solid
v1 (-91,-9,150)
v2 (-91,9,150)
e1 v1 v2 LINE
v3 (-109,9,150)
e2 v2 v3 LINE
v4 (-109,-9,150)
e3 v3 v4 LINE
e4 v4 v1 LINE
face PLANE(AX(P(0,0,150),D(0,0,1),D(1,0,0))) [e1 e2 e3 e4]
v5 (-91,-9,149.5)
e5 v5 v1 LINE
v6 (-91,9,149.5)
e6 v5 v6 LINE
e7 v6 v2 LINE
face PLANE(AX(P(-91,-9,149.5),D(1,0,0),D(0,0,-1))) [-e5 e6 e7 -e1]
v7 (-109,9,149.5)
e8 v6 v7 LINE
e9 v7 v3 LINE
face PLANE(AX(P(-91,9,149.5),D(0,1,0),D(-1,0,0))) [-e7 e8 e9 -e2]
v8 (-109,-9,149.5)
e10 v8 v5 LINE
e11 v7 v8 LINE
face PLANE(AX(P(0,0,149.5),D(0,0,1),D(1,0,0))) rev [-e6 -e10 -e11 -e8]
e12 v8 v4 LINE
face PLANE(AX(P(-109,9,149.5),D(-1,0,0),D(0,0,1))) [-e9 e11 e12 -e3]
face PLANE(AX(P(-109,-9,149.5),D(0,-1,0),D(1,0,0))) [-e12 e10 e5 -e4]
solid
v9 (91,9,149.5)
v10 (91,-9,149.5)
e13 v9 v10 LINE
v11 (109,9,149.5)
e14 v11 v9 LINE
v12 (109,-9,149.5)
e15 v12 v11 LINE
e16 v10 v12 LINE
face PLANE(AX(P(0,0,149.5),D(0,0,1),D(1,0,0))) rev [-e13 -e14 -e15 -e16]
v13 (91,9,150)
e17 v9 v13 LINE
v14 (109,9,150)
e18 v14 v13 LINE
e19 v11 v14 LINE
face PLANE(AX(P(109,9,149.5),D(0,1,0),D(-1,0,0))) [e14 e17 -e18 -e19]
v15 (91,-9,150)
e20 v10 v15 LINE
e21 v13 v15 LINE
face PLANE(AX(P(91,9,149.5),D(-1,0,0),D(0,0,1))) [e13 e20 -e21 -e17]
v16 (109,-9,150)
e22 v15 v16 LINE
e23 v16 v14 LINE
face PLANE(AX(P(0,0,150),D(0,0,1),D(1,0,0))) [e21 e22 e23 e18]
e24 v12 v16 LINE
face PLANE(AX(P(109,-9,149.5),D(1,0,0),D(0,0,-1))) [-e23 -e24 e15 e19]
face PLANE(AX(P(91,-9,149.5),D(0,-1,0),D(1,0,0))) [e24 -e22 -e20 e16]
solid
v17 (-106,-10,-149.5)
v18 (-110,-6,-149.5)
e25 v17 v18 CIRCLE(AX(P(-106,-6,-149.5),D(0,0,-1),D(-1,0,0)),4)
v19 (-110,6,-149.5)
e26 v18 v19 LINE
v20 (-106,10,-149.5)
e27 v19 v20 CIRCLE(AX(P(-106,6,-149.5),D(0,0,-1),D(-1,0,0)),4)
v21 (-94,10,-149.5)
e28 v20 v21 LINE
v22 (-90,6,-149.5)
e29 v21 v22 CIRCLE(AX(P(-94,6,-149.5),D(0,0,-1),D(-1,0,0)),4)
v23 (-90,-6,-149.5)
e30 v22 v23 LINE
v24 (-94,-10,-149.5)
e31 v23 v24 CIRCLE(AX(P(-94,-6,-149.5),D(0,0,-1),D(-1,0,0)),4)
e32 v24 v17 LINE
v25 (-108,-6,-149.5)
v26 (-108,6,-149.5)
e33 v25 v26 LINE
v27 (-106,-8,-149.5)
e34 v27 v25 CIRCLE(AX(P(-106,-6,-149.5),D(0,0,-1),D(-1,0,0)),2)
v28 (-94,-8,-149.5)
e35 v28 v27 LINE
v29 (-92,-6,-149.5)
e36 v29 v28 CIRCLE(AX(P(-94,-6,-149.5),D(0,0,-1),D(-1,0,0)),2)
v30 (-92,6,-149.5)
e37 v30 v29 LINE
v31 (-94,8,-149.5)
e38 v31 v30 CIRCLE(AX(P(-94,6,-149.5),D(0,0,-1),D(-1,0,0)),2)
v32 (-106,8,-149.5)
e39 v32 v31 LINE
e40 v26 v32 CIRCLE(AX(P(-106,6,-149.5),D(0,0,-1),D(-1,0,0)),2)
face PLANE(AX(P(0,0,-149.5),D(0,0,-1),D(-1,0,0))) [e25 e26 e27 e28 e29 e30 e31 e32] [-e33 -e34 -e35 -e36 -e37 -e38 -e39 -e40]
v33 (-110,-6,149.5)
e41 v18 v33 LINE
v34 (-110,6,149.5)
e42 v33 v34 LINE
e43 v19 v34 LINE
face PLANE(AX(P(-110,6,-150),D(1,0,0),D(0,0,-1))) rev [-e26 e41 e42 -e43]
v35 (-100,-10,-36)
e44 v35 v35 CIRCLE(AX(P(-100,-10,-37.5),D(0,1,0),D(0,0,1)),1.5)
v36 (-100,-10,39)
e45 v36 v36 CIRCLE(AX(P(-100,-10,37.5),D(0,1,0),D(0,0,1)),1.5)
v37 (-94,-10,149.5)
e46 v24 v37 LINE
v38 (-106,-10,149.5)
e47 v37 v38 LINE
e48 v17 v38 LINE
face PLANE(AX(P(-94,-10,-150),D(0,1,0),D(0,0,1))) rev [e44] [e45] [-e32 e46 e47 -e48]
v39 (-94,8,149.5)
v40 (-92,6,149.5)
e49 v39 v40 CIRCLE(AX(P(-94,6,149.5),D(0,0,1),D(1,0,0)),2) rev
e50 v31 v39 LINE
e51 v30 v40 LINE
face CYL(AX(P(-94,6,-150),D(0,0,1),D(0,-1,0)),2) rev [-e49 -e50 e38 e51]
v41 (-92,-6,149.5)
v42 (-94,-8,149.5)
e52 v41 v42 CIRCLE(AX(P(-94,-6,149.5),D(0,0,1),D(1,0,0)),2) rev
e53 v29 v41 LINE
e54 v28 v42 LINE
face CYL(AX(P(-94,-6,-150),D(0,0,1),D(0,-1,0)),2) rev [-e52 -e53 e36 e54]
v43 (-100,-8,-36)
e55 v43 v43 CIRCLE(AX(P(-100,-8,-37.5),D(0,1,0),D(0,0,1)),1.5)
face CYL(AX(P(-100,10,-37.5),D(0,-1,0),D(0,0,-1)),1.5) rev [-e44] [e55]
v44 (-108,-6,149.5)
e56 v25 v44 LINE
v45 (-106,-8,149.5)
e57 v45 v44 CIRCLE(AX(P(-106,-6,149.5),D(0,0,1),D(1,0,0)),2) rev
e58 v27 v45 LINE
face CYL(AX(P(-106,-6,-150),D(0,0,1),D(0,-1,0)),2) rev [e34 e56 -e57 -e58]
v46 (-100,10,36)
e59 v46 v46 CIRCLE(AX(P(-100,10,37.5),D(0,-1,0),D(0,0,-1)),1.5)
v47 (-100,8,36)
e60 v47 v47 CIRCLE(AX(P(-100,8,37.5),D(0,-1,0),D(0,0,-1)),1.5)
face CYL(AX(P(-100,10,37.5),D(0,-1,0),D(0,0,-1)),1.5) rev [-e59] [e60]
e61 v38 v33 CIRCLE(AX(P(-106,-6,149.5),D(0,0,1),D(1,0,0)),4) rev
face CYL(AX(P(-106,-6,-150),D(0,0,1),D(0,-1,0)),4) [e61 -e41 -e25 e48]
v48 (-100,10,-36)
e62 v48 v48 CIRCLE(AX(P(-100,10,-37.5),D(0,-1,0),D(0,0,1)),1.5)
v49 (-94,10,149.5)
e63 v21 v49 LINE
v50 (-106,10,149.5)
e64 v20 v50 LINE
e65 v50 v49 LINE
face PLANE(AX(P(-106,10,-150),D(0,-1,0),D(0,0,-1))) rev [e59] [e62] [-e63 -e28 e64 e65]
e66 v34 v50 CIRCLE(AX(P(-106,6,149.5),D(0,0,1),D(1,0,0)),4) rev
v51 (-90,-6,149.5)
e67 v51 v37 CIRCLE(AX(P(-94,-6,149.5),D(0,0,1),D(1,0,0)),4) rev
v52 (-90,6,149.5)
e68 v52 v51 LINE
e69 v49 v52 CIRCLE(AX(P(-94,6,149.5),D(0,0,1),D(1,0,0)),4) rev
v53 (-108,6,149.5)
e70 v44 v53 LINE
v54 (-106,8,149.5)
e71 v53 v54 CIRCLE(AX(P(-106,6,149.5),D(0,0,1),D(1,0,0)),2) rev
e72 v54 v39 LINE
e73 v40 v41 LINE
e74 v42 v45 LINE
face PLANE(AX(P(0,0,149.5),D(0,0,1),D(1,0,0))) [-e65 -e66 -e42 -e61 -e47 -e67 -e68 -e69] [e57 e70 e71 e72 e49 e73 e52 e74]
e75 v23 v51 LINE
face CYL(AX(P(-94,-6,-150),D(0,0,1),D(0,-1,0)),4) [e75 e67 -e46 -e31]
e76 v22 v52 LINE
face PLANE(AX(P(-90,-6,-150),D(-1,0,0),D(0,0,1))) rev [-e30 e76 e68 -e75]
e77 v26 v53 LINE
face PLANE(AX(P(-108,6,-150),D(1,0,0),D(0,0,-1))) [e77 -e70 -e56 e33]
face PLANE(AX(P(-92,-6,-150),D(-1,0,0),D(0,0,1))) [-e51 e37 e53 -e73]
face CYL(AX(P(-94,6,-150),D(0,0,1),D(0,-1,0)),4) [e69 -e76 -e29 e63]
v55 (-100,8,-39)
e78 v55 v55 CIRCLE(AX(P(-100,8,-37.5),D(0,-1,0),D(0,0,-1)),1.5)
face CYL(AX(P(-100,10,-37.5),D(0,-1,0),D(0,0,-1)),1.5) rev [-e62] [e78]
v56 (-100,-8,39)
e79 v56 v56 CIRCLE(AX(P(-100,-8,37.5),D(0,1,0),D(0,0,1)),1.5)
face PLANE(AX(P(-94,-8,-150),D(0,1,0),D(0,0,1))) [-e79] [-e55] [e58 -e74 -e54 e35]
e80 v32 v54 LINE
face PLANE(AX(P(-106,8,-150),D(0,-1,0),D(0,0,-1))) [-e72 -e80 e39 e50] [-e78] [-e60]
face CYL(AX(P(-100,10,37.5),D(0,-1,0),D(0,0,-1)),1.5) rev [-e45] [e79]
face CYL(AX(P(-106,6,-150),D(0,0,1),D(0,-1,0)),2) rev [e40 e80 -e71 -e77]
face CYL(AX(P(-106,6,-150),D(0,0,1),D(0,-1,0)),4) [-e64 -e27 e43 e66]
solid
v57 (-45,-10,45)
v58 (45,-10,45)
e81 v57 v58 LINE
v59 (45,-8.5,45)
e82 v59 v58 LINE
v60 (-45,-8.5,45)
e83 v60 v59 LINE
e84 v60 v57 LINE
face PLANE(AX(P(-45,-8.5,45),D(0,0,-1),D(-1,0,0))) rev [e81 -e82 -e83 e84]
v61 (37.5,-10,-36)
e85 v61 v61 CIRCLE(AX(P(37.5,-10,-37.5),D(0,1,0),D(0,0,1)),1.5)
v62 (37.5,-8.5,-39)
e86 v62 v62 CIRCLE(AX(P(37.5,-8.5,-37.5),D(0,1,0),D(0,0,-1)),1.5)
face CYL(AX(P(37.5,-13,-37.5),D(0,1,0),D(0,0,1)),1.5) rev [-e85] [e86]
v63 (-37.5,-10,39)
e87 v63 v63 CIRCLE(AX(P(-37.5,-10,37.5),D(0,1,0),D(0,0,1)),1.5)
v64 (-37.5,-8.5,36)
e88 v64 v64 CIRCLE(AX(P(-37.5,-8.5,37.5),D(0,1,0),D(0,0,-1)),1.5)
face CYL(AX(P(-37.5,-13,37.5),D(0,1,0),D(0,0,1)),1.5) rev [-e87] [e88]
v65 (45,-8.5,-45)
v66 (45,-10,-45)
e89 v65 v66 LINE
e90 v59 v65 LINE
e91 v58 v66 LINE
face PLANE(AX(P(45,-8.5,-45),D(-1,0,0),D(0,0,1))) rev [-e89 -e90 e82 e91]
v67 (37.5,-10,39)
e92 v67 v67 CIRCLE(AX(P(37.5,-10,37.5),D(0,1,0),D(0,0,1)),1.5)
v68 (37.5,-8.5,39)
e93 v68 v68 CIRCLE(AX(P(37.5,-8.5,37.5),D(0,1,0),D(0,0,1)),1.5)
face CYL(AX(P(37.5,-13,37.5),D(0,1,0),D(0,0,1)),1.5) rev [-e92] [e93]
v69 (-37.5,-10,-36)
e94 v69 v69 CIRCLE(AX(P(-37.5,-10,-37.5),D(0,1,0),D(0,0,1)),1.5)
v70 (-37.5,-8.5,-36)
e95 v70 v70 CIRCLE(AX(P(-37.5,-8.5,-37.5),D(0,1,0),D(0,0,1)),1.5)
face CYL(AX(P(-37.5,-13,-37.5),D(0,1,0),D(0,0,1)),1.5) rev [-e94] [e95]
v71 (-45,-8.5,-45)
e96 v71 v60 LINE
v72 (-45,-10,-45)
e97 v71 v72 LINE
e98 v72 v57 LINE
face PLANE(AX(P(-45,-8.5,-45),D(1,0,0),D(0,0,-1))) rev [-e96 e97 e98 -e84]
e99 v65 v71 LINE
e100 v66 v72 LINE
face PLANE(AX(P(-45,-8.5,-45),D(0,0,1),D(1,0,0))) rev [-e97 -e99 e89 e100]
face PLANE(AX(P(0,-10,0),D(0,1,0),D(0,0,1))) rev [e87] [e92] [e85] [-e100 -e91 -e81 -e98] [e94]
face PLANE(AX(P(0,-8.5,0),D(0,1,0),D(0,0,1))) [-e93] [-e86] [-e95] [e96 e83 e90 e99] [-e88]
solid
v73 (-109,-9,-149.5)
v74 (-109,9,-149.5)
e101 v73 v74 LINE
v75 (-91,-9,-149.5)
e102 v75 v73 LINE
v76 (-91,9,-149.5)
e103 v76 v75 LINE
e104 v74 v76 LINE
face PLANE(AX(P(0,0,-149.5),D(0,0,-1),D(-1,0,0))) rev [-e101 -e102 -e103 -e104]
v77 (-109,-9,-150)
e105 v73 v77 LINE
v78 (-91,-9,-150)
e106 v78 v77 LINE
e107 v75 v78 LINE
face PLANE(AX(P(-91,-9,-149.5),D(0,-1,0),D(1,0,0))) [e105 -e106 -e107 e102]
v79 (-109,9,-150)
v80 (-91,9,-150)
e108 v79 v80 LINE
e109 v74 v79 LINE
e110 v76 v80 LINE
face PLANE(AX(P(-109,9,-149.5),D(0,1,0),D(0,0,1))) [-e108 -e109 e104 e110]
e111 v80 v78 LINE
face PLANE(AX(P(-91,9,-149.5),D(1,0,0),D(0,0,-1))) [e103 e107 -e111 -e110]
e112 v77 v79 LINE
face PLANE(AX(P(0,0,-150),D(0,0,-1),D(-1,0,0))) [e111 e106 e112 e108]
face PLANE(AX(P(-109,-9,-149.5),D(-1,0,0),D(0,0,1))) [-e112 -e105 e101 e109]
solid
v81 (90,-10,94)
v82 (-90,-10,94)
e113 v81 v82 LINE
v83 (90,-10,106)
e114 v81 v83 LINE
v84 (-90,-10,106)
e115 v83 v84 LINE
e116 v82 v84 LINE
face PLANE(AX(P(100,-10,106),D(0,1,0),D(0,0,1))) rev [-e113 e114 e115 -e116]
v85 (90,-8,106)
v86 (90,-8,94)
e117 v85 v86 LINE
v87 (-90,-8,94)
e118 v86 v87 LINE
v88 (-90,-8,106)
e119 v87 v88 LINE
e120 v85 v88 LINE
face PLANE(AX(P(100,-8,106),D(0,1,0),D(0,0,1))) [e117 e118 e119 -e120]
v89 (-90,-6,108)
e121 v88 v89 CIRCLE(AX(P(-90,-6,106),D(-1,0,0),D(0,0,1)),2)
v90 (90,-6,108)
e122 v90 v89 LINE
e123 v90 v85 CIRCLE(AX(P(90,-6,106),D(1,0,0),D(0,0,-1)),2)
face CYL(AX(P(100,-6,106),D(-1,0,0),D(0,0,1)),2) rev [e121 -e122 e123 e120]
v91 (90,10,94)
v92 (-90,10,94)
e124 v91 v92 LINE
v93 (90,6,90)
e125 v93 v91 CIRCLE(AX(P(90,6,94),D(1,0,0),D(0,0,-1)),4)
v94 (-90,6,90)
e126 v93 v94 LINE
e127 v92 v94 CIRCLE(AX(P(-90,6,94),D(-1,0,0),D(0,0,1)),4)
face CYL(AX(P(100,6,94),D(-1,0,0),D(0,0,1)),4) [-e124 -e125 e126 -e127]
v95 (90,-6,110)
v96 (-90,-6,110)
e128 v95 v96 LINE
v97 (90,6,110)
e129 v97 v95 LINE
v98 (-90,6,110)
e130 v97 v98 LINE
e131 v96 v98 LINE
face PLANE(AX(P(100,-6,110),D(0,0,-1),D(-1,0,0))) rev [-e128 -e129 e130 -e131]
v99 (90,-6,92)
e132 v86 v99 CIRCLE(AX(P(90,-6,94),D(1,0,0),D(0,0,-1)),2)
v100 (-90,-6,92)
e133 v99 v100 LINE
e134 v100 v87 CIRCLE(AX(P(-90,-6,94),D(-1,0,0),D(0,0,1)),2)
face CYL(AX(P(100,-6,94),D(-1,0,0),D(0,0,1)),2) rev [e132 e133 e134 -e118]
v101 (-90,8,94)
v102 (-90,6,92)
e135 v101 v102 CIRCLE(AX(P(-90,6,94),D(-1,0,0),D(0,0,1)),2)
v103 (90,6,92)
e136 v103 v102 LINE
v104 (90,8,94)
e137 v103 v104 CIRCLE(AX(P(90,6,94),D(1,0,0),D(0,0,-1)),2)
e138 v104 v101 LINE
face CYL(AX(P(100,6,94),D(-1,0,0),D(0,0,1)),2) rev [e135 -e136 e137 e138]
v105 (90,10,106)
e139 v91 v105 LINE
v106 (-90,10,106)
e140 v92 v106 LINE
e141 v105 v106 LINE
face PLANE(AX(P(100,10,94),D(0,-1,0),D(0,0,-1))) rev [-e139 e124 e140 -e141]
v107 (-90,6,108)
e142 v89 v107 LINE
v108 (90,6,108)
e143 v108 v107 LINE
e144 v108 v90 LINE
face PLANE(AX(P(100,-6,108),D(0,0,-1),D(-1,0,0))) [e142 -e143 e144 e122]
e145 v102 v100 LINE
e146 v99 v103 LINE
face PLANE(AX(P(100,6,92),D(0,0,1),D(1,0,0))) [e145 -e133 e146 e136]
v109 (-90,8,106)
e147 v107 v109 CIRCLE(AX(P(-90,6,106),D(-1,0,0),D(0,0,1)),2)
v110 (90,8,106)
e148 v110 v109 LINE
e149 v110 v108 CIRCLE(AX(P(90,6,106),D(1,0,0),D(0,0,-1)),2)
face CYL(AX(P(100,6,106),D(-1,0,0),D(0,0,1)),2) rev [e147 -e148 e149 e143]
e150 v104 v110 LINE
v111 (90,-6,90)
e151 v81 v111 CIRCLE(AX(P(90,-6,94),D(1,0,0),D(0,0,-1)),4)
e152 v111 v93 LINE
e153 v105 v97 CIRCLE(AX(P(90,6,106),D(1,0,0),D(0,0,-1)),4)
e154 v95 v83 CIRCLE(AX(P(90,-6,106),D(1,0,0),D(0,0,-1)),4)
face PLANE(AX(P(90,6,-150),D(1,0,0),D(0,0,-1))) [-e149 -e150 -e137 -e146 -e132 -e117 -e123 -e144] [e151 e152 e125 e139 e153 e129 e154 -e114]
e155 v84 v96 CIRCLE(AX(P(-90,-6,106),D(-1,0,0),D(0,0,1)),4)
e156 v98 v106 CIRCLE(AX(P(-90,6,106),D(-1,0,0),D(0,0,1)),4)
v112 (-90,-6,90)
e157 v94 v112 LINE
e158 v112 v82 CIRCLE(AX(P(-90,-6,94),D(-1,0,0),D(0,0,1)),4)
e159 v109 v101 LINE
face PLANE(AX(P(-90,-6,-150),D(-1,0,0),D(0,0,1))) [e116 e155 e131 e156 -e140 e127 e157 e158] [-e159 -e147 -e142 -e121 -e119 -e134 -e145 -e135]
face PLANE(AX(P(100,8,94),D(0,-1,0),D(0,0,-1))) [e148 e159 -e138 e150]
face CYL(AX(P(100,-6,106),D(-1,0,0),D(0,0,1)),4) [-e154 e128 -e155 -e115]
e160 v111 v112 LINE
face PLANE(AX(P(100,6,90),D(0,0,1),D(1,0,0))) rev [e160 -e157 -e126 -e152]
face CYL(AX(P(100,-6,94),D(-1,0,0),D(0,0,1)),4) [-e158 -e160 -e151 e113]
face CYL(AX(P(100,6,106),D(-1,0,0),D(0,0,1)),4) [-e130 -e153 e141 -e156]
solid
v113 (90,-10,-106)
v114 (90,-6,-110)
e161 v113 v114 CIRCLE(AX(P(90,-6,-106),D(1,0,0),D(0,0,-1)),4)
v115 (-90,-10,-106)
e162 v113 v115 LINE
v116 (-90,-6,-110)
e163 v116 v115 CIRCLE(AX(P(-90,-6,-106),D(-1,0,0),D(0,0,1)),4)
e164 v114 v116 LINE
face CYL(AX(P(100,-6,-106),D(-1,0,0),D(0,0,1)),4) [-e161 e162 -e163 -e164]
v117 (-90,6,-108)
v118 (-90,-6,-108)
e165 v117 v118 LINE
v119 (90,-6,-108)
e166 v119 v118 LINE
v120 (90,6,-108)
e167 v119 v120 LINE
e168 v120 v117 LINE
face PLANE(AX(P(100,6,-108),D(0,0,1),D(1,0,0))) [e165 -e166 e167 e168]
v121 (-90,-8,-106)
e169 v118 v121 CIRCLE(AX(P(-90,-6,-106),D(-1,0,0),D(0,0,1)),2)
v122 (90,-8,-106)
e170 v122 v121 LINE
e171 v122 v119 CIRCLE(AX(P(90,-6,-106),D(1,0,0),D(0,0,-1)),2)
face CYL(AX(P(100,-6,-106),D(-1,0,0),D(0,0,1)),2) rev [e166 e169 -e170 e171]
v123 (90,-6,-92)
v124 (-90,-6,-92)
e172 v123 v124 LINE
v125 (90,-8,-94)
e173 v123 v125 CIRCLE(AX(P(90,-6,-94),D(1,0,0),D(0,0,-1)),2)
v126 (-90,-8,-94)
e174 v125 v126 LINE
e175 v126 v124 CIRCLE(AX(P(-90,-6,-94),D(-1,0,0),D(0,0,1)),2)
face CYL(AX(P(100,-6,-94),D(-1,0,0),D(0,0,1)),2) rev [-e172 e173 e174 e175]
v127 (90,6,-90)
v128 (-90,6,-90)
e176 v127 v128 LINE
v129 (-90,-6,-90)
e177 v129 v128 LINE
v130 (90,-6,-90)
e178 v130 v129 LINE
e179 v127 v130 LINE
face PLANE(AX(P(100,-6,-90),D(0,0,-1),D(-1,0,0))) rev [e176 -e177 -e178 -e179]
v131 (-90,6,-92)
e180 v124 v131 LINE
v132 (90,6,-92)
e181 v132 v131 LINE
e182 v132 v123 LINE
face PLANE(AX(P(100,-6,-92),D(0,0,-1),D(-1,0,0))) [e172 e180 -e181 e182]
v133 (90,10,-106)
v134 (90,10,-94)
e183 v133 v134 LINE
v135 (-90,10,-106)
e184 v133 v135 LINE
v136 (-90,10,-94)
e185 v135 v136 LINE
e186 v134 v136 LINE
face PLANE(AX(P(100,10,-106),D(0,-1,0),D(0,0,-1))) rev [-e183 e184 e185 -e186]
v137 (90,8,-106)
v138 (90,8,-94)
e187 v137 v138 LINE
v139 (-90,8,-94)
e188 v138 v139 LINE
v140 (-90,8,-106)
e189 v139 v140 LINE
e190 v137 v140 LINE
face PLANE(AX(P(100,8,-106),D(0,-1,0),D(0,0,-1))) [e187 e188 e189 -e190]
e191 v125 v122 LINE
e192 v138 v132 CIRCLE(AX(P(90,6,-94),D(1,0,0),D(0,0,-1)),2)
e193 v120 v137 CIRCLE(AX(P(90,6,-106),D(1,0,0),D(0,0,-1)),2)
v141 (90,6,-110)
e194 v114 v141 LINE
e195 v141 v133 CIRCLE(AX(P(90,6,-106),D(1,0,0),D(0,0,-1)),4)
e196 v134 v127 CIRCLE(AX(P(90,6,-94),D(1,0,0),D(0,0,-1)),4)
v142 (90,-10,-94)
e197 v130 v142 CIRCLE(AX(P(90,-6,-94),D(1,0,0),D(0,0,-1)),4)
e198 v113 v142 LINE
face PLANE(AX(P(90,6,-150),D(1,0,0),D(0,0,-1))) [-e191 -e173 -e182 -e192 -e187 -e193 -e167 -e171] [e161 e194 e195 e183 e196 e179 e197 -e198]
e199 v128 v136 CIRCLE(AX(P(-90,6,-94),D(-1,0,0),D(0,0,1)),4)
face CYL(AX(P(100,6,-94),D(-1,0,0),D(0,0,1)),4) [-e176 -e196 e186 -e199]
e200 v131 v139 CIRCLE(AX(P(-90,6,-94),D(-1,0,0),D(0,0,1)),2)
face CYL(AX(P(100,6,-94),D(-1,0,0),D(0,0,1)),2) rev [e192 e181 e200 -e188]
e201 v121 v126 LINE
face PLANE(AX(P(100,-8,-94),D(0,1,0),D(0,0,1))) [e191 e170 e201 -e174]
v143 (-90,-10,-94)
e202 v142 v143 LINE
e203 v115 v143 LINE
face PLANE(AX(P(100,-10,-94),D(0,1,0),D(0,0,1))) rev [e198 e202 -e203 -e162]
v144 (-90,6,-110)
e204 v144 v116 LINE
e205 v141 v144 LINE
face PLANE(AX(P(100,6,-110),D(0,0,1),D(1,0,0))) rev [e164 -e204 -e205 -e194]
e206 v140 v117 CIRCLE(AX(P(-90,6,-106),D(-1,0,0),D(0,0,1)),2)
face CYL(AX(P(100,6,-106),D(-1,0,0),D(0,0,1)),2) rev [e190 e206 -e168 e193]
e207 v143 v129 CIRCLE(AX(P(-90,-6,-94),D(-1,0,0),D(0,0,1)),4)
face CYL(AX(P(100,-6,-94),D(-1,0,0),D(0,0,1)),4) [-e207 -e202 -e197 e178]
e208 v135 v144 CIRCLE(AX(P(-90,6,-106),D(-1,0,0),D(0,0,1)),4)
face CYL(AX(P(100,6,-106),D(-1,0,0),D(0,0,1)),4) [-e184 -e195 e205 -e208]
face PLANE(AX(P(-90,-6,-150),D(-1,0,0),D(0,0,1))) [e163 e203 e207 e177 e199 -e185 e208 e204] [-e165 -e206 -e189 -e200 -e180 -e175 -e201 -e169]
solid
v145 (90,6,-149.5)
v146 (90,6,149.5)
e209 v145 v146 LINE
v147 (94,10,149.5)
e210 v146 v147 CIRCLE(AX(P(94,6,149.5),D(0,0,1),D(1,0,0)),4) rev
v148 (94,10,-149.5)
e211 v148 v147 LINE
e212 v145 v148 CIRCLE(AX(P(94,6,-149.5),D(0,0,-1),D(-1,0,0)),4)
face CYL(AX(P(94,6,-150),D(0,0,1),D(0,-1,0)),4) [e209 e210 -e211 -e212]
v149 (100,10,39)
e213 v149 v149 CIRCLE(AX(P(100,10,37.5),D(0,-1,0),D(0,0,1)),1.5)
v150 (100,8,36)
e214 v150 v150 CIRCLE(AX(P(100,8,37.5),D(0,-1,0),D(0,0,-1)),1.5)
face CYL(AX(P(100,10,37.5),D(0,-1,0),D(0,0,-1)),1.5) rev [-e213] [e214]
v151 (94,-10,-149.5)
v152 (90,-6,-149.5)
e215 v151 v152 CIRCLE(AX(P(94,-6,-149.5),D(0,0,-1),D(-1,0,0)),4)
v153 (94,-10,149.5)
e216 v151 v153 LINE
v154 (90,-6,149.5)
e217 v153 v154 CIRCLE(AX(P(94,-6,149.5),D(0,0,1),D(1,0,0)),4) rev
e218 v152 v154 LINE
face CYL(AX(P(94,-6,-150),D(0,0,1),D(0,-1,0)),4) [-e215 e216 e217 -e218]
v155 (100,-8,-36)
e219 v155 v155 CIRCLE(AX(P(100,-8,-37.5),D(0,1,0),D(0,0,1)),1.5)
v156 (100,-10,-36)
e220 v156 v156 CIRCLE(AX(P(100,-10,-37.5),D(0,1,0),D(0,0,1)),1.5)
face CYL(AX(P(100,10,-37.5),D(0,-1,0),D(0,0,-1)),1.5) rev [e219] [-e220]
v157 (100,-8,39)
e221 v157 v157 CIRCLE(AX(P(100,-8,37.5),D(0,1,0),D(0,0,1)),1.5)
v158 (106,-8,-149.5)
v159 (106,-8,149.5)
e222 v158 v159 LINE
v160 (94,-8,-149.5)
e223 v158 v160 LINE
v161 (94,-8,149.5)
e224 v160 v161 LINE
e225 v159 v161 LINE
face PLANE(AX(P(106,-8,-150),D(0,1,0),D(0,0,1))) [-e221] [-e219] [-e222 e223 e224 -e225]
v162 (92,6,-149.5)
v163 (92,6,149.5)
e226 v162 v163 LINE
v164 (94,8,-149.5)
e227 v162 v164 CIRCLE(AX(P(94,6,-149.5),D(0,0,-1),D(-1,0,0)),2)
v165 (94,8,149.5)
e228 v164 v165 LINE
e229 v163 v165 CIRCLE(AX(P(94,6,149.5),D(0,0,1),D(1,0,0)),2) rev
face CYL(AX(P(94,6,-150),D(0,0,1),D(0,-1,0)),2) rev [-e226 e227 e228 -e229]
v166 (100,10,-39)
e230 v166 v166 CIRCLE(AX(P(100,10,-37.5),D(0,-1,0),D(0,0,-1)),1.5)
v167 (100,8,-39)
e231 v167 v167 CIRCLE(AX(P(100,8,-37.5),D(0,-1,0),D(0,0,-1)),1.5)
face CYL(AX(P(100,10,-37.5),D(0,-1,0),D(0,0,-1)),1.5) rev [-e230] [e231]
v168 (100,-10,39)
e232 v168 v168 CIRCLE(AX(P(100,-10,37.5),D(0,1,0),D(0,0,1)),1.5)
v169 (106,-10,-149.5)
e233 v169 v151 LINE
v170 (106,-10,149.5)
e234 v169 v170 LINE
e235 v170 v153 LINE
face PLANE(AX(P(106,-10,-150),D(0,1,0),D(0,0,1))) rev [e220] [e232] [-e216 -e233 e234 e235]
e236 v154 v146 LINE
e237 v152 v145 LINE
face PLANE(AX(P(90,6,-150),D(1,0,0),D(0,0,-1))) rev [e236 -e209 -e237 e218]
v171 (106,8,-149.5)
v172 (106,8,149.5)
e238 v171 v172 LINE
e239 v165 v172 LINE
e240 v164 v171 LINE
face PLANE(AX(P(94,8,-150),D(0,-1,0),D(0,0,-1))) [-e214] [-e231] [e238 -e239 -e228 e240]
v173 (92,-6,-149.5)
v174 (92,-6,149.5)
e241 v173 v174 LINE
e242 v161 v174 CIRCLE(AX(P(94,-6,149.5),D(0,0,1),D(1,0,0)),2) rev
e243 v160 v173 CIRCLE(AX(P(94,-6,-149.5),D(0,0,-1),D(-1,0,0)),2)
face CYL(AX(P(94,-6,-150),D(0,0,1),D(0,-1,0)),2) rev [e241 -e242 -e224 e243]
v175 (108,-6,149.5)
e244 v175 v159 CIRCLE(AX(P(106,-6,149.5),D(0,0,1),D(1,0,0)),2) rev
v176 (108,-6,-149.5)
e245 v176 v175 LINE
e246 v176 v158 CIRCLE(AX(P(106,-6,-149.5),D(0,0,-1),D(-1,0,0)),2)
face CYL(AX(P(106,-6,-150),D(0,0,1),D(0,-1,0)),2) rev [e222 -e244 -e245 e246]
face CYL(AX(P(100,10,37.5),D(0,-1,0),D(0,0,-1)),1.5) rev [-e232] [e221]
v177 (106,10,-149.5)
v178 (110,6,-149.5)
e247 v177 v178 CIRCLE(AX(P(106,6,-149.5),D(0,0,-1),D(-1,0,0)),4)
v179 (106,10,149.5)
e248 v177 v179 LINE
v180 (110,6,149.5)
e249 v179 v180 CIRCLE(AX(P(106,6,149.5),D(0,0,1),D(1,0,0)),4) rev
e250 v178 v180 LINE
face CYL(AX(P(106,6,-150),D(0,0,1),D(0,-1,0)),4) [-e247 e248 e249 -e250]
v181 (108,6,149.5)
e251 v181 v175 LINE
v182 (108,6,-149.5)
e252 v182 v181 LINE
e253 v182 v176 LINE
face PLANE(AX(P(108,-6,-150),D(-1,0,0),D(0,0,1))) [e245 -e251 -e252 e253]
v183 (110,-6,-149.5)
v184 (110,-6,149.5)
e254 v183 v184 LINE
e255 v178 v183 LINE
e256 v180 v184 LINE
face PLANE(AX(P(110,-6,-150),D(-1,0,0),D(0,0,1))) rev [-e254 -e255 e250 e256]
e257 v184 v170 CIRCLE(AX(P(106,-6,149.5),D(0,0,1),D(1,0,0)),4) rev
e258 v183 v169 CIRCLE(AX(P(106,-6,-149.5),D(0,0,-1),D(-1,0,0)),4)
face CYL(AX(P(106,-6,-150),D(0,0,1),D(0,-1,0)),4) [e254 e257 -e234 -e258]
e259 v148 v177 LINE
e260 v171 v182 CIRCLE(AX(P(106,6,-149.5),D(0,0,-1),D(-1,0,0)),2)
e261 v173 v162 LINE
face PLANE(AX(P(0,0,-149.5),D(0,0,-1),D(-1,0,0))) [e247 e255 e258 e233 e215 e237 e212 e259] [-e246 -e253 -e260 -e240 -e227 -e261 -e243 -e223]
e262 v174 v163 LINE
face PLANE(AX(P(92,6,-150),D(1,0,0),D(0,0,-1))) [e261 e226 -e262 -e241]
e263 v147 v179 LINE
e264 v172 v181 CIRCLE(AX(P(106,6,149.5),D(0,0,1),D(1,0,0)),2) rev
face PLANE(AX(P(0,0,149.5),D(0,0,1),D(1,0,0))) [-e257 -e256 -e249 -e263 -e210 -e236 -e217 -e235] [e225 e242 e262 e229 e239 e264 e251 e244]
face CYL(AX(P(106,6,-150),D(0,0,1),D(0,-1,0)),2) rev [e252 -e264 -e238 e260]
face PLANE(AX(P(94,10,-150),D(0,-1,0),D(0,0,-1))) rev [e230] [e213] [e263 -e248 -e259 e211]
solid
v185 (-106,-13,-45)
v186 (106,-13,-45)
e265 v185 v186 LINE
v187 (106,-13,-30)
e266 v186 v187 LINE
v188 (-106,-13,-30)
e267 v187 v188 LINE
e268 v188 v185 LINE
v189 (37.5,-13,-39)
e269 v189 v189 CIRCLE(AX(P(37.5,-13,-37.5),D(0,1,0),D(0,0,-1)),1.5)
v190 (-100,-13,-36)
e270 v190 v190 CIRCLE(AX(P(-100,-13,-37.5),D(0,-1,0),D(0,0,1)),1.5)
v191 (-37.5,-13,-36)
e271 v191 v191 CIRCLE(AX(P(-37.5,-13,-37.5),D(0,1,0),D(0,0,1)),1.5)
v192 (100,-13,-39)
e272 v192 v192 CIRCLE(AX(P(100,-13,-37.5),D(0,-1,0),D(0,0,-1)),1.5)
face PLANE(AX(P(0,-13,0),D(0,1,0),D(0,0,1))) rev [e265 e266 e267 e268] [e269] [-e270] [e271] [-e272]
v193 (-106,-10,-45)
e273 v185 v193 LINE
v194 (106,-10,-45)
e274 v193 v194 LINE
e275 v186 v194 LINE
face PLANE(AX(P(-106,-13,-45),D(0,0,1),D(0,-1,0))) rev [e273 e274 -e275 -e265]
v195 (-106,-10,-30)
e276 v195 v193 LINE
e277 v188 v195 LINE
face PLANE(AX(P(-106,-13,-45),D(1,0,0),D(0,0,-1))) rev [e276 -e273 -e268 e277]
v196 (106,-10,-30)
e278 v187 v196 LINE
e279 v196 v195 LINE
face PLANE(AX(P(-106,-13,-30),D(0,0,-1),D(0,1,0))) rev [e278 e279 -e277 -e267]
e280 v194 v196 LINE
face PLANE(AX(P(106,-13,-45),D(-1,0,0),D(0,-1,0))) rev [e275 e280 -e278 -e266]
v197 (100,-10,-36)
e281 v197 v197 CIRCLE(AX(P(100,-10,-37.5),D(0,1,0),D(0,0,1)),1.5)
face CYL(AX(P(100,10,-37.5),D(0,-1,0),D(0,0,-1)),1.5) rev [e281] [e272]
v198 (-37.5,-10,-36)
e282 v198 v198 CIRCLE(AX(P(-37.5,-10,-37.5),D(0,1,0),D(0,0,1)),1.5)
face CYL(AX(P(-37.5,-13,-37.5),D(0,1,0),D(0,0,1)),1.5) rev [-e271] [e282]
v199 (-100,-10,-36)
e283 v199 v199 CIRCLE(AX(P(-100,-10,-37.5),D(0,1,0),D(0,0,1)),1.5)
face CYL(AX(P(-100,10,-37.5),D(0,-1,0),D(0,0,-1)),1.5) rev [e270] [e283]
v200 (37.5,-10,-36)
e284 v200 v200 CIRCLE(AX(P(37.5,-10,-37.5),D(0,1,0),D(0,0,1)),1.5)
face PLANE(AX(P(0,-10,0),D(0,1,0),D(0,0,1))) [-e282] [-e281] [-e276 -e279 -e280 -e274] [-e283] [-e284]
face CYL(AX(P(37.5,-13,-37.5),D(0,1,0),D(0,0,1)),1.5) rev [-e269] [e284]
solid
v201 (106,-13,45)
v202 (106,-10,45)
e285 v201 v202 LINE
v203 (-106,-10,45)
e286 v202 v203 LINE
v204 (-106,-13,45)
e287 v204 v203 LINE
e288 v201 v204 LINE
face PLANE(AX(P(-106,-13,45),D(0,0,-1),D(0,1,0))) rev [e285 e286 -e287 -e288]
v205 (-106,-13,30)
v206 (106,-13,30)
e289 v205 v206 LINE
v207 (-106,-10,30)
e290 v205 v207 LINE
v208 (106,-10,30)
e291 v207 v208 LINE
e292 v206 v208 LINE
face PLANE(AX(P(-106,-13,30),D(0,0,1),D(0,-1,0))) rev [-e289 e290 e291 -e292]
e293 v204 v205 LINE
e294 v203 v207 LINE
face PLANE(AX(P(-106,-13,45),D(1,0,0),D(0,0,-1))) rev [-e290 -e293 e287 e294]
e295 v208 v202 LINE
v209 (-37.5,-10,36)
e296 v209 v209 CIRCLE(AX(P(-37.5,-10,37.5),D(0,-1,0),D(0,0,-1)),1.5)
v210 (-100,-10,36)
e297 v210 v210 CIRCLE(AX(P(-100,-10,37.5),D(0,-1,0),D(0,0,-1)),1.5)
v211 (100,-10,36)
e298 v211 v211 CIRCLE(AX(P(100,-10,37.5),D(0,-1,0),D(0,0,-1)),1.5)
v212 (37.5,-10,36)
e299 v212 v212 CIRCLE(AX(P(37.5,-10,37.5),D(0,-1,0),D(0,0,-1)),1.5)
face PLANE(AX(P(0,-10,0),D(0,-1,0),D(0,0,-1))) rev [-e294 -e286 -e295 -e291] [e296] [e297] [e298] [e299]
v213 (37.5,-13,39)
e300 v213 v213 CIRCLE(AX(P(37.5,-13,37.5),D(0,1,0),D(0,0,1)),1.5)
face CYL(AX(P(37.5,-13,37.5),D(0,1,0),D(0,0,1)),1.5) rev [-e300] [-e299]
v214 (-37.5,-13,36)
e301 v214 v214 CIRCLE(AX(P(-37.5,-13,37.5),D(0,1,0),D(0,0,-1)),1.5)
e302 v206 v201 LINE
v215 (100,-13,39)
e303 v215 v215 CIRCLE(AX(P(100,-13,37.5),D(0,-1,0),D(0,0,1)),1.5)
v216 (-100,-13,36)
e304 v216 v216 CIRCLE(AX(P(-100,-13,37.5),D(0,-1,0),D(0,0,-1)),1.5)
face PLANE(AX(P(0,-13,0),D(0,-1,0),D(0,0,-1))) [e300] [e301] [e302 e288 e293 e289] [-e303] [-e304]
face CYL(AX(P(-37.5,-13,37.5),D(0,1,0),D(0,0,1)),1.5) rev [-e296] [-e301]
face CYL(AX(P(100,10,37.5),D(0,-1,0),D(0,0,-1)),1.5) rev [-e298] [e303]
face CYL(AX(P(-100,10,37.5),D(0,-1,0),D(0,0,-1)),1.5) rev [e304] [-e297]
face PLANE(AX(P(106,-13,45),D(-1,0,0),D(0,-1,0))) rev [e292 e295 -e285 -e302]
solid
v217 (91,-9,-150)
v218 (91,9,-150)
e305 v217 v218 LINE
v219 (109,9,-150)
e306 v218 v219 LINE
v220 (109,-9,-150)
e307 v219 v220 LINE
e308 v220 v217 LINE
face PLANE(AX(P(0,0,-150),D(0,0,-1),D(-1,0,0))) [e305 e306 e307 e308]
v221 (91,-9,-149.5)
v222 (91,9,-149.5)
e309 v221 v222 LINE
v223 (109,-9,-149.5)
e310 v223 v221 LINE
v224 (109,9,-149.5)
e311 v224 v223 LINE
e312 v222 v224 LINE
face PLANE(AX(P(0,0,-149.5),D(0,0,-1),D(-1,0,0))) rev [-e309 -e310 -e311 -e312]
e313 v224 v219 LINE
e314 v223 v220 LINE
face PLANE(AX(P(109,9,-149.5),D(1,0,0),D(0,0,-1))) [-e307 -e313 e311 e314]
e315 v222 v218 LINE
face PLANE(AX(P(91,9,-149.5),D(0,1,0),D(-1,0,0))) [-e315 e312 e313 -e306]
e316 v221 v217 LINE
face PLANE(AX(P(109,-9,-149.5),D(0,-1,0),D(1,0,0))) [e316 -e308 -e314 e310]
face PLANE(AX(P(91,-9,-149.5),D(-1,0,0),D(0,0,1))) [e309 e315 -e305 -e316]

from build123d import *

# Parameters (mm, degrees)
SQUARE_TUBE_20_X_20_X_2_3_DEPTH      = 201
SQUARE_TUBE_20_X_20_X_2_3_DEPTH_BACK = 1
SQUARE_TUBE_20_X_20_X_2_3_2_DEPTH    = 202
SQUARE_TUBE_20_X_20_X_2_3_3_DEPTH    = 300
SQUARE_TUBE_20_X_20_X_2_3_4_DEPTH    = 300
END_START                            = -109
END_CAP1_OUTLINE_W                   = 18
END_CAP1_OUTLINE_H                   = 0.5
END_CAP1_DEPTH                       = 18
END_START_2                          = 91
END_CAP1_2_OUTLINE_W                 = 18
END_CAP1_2_OUTLINE_H                 = 0.5
END_CAP1_2_DEPTH                     = 18
END_START_3                          = -9
END_CAP1_3_OUTLINE_W                 = 18
END_CAP1_3_OUTLINE_H                 = 0.5
END_CAP1_3_DEPTH                     = 18
END_CAP1_4_OUTLINE_W                 = 18
END_CAP1_4_OUTLINE_H                 = 0.5
END_CAP1_4_DEPTH                     = 18
END_START_4                          = -150
END_CAP1_5_DEPTH                     = 0.5
END_START_5                          = 149.5
END_CAP1_6_DEPTH                     = 0.5
END_CAP1_7_DEPTH                     = 0.5
END_CAP1_8_DEPTH                     = 0.5
SKETCH16_W                           = 212
SKETCH16_H                           = 15
BOSS_EXTRUDE4_DEPTH                  = 3
BOSS_EXTRUDE4_2_DEPTH                = 3
SKETCH17_R                           = 1.5
CUT_EXTRUDE1_DEPTH                   = 188.427319247
SKETCH18_W                           = 90
SKETCH18_H                           = 90
BOSS_EXTRUDE5_DEPTH                  = 1.5
SKETCH19_R                           = 1.5
CUT_EXTRUDE2_DEPTH                   = 187.928462252


# Read off the part's stored shape, not the designer's step: End cap1
with BuildPart() as part:
    # Sketch1 → Square tube 20 X 20 X 2(3) (new, two sides: drawn at the far end of the back side and taken through both)
    with BuildSketch(Plane(origin=(-100, 0, 100), x_dir=(0, 0, -1), z_dir=(1, 0, 0)).offset(-SQUARE_TUBE_20_X_20_X_2_3_DEPTH_BACK)):
        with BuildLine():
            Line((-6, -10), (6, -10))
            ThreePointArc((6, -10), (8.828427125, -8.828427125), (10, -6))
            Line((10, -6), (10, 6))
            ThreePointArc((10, 6), (8.828427125, 8.828427125), (6, 10))
            Line((6, 10), (-6, 10))
            ThreePointArc((-6, 10), (-8.828427125, 8.828427125), (-10, 6))
            Line((-10, 6), (-10, -6))
            ThreePointArc((-10, -6), (-8.828427125, -8.828427125), (-6, -10))
        make_face()
        with BuildLine():
            Line((-6, -8), (6, -8))
            ThreePointArc((6, -8), (7.414213562, -7.414213562), (8, -6))
            Line((8, -6), (8, 6))
            ThreePointArc((8, 6), (7.414213562, 7.414213562), (6, 8))
            Line((6, 8), (-6, 8))
            ThreePointArc((-6, 8), (-7.414213562, 7.414213562), (-8, 6))
            Line((-8, 6), (-8, -6))
            ThreePointArc((-8, -6), (-7.414213562, -7.414213562), (-6, -8))
        make_face(mode=Mode.SUBTRACT)
    extrude(amount=SQUARE_TUBE_20_X_20_X_2_3_DEPTH + SQUARE_TUBE_20_X_20_X_2_3_DEPTH_BACK)

    # Square tube 20 X 20 X 2(3) end butt 1
    split(bisect_by=Plane(origin=(-90, 0, 100), x_dir=(0, 1, 0), z_dir=(1, 0, 0)), keep=Keep.TOP)

    # Square tube 20 X 20 X 2(3) end butt 2
    split(bisect_by=Plane(origin=(90, 0, 100), x_dir=(0, -1, 0), z_dir=(-1, 0, 0)), keep=Keep.TOP)


with BuildPart() as body_2:
    # Sketch1 on segment 2 (carried to segment 2) → Square tube 20 X 20 X 2_3 2 (new body)
    with BuildSketch(Plane(origin=(-101, 0, -100), x_dir=(0, 0, -1), z_dir=(1, 0, 0))):
        with BuildLine():
            Line((-6, -10), (6, -10))
            ThreePointArc((6, -10), (8.828427125, -8.828427125), (10, -6))
            Line((10, -6), (10, 6))
            ThreePointArc((10, 6), (8.828427125, 8.828427125), (6, 10))
            Line((6, 10), (-6, 10))
            ThreePointArc((-6, 10), (-8.828427125, 8.828427125), (-10, 6))
            Line((-10, 6), (-10, -6))
            ThreePointArc((-10, -6), (-8.828427125, -8.828427125), (-6, -10))
        make_face()
        with BuildLine():
            Line((-6, -8), (6, -8))
            ThreePointArc((6, -8), (7.414213562, -7.414213562), (8, -6))
            Line((8, -6), (8, 6))
            ThreePointArc((8, 6), (7.414213562, 7.414213562), (6, 8))
            Line((6, 8), (-6, 8))
            ThreePointArc((-6, 8), (-7.414213562, 7.414213562), (-8, 6))
            Line((-8, 6), (-8, -6))
            ThreePointArc((-8, -6), (-7.414213562, -7.414213562), (-6, -8))
        make_face(mode=Mode.SUBTRACT)
    extrude(amount=SQUARE_TUBE_20_X_20_X_2_3_2_DEPTH)

    # Square tube 20 X 20 X 2_3 2 end butt 1
    split(bisect_by=Plane(origin=(-90, 0, -100), x_dir=(0, 1, 0), z_dir=(1, 0, 0)), keep=Keep.TOP)

    # Square tube 20 X 20 X 2_3 2 end butt 2
    split(bisect_by=Plane(origin=(90, 0, -100), x_dir=(0, -1, 0), z_dir=(-1, 0, 0)), keep=Keep.TOP)


with BuildPart() as body_3:
    # Sketch1 on segment 3 (carried to segment 3) → Square tube 20 X 20 X 2_3 3 (new body)
    with BuildSketch(Plane(origin=(100, 0, 150), x_dir=(-1, 0, 0), z_dir=(0, 0, -1))):
        with BuildLine():
            Line((-6, -10), (6, -10))
            ThreePointArc((6, -10), (8.828427125, -8.828427125), (10, -6))
            Line((10, -6), (10, 6))
            ThreePointArc((10, 6), (8.828427125, 8.828427125), (6, 10))
            Line((6, 10), (-6, 10))
            ThreePointArc((-6, 10), (-8.828427125, 8.828427125), (-10, 6))
            Line((-10, 6), (-10, -6))
            ThreePointArc((-10, -6), (-8.828427125, -8.828427125), (-6, -10))
        make_face()
        with BuildLine():
            Line((-6, -8), (6, -8))
            ThreePointArc((6, -8), (7.414213562, -7.414213562), (8, -6))
            Line((8, -6), (8, 6))
            ThreePointArc((8, 6), (7.414213562, 7.414213562), (6, 8))
            Line((6, 8), (-6, 8))
            ThreePointArc((-6, 8), (-7.414213562, 7.414213562), (-8, 6))
            Line((-8, 6), (-8, -6))
            ThreePointArc((-8, -6), (-7.414213562, -7.414213562), (-6, -8))
        make_face(mode=Mode.SUBTRACT)
    extrude(amount=SQUARE_TUBE_20_X_20_X_2_3_3_DEPTH)

    # End cap1 7 outline → End cap1 7 (cut)
    with BuildSketch(Plane.XY.offset(END_START_4)):
        with BuildLine():
            Line((94, -10), (106, -10))
            ThreePointArc((106, -10), (108.828427125, -8.828427125), (110, -6))
            Line((110, -6), (110, 6))
            ThreePointArc((110, 6), (108.828427125, 8.828427125), (106, 10))
            Line((106, 10), (94, 10))
            ThreePointArc((94, 10), (91.171572875, 8.828427125), (90, 6))
            Line((90, 6), (90, -6))
            ThreePointArc((90, -6), (91.171572875, -8.828427125), (94, -10))
        make_face()
        with BuildLine():
            ThreePointArc((94, -8), (92.585786438, -7.414213562), (92, -6))
            Line((92, -6), (92, 6))
            ThreePointArc((92, 6), (92.585786438, 7.414213562), (94, 8))
            Line((94, 8), (106, 8))
            ThreePointArc((106, 8), (107.414213562, 7.414213562), (108, 6))
            Line((108, 6), (108, -6))
            ThreePointArc((108, -6), (107.414213562, -7.414213562), (106, -8))
            Line((106, -8), (94, -8))
        make_face(mode=Mode.SUBTRACT)
    extrude(amount=END_CAP1_7_DEPTH, mode=Mode.SUBTRACT)

    # End cap1 8 outline → End cap1 8 (cut)
    with BuildSketch(Plane.XY.offset(END_START_5)):
        with BuildLine():
            Line((94, -10), (106, -10))
            ThreePointArc((106, -10), (108.828427125, -8.828427125), (110, -6))
            Line((110, -6), (110, 6))
            ThreePointArc((110, 6), (108.828427125, 8.828427125), (106, 10))
            Line((106, 10), (94, 10))
            ThreePointArc((94, 10), (91.171572875, 8.828427125), (90, 6))
            Line((90, 6), (90, -6))
            ThreePointArc((90, -6), (91.171572875, -8.828427125), (94, -10))
        make_face()
        with BuildLine():
            ThreePointArc((94, -8), (92.585786438, -7.414213562), (92, -6))
            Line((92, -6), (92, 6))
            ThreePointArc((92, 6), (92.585786438, 7.414213562), (94, 8))
            Line((94, 8), (106, 8))
            ThreePointArc((106, 8), (107.414213562, 7.414213562), (108, 6))
            Line((108, 6), (108, -6))
            ThreePointArc((108, -6), (107.414213562, -7.414213562), (106, -8))
            Line((106, -8), (94, -8))
        make_face(mode=Mode.SUBTRACT)
    extrude(amount=END_CAP1_8_DEPTH, mode=Mode.SUBTRACT)


with BuildPart() as body_4:
    # Sketch1 on segment 4 (carried to segment 4) → Square tube 20 X 20 X 2_3 4 (new body)
    with BuildSketch(Plane(origin=(-100, 0, 150), x_dir=(-1, 0, 0), z_dir=(0, 0, -1))):
        with BuildLine():
            Line((-6, -10), (6, -10))
            ThreePointArc((6, -10), (8.828427125, -8.828427125), (10, -6))
            Line((10, -6), (10, 6))
            ThreePointArc((10, 6), (8.828427125, 8.828427125), (6, 10))
            Line((6, 10), (-6, 10))
            ThreePointArc((-6, 10), (-8.828427125, 8.828427125), (-10, 6))
            Line((-10, 6), (-10, -6))
            ThreePointArc((-10, -6), (-8.828427125, -8.828427125), (-6, -10))
        make_face()
        with BuildLine():
            Line((-6, -8), (6, -8))
            ThreePointArc((6, -8), (7.414213562, -7.414213562), (8, -6))
            Line((8, -6), (8, 6))
            ThreePointArc((8, 6), (7.414213562, 7.414213562), (6, 8))
            Line((6, 8), (-6, 8))
            ThreePointArc((-6, 8), (-7.414213562, 7.414213562), (-8, 6))
            Line((-8, 6), (-8, -6))
            ThreePointArc((-8, -6), (-7.414213562, -7.414213562), (-6, -8))
        make_face(mode=Mode.SUBTRACT)
    extrude(amount=SQUARE_TUBE_20_X_20_X_2_3_4_DEPTH)

    # End cap1 5 outline → End cap1 5 (cut)
    with BuildSketch(Plane.XY.offset(END_START_4)):
        with BuildLine():
            Line((-106, -10), (-94, -10))
            ThreePointArc((-94, -10), (-91.171572875, -8.828427125), (-90, -6))
            Line((-90, -6), (-90, 6))
            ThreePointArc((-90, 6), (-91.171572875, 8.828427125), (-94, 10))
            Line((-94, 10), (-106, 10))
            ThreePointArc((-106, 10), (-108.828427125, 8.828427125), (-110, 6))
            Line((-110, 6), (-110, -6))
            ThreePointArc((-110, -6), (-108.828427125, -8.828427125), (-106, -10))
        make_face()
        with BuildLine():
            ThreePointArc((-106, -8), (-107.414213562, -7.414213562), (-108, -6))
            Line((-108, -6), (-108, 6))
            ThreePointArc((-108, 6), (-107.414213562, 7.414213562), (-106, 8))
            Line((-106, 8), (-94, 8))
            ThreePointArc((-94, 8), (-92.585786438, 7.414213562), (-92, 6))
            Line((-92, 6), (-92, -6))
            ThreePointArc((-92, -6), (-92.585786438, -7.414213562), (-94, -8))
            Line((-94, -8), (-106, -8))
        make_face(mode=Mode.SUBTRACT)
    extrude(amount=END_CAP1_5_DEPTH, mode=Mode.SUBTRACT)

    # End cap1 6 outline → End cap1 6 (cut)
    with BuildSketch(Plane.XY.offset(END_START_5)):
        with BuildLine():
            Line((-106, -10), (-94, -10))
            ThreePointArc((-94, -10), (-91.171572875, -8.828427125), (-90, -6))
            Line((-90, -6), (-90, 6))
            ThreePointArc((-90, 6), (-91.171572875, 8.828427125), (-94, 10))
            Line((-94, 10), (-106, 10))
            ThreePointArc((-106, 10), (-108.828427125, 8.828427125), (-110, 6))
            Line((-110, 6), (-110, -6))
            ThreePointArc((-110, -6), (-108.828427125, -8.828427125), (-106, -10))
        make_face()
        with BuildLine():
            ThreePointArc((-106, -8), (-107.414213562, -7.414213562), (-108, -6))
            Line((-108, -6), (-108, 6))
            ThreePointArc((-108, 6), (-107.414213562, 7.414213562), (-106, 8))
            Line((-106, 8), (-94, 8))
            ThreePointArc((-94, 8), (-92.585786438, 7.414213562), (-92, 6))
            Line((-92, 6), (-92, -6))
            ThreePointArc((-92, -6), (-92.585786438, -7.414213562), (-94, -8))
            Line((-94, -8), (-106, -8))
        make_face(mode=Mode.SUBTRACT)
    extrude(amount=END_CAP1_6_DEPTH, mode=Mode.SUBTRACT)


with BuildPart() as body_5:
    # End cap1 outline → End cap1 (new body)
    with BuildSketch(Plane.YZ.offset(END_START)):
        with Locations((0, -149.75)):
            Rectangle(END_CAP1_OUTLINE_W, END_CAP1_OUTLINE_H)
    extrude(amount=END_CAP1_DEPTH)


with BuildPart() as body_6:
    # End cap1 2 outline → End cap1 2 (new body)
    with BuildSketch(Plane.YZ.offset(END_START_2)):
        with Locations((0, -149.75)):
            Rectangle(END_CAP1_2_OUTLINE_W, END_CAP1_2_OUTLINE_H)
    extrude(amount=END_CAP1_2_DEPTH)


with BuildPart() as body_7:
    # End cap1 3 outline → End cap1 3 (new body)
    with BuildSketch(Plane(origin=(0, 0, 0), x_dir=(1, 0, 0), z_dir=(0, 1, 0)).offset(END_START_3)):
        with Locations((-100, -149.75)):
            Rectangle(END_CAP1_3_OUTLINE_W, END_CAP1_3_OUTLINE_H)
    extrude(amount=END_CAP1_3_DEPTH)


with BuildPart() as body_8:
    # End cap1 4 outline → End cap1 4 (new body)
    with BuildSketch(Plane(origin=(0, 0, 0), x_dir=(1, 0, 0), z_dir=(0, 1, 0)).offset(END_START_3)):
        with Locations((100, -149.75)):
            Rectangle(END_CAP1_4_OUTLINE_W, END_CAP1_4_OUTLINE_H)
    extrude(amount=END_CAP1_4_DEPTH)


with BuildPart() as body_9:
    # Sketch16 → Boss-Extrude4 (new body)
    with BuildSketch(Plane.XZ.offset(10)):
        with Locations((0, 37.5)):
            Rectangle(SKETCH16_W, SKETCH16_H)
    extrude(amount=BOSS_EXTRUDE4_DEPTH)


with BuildPart() as body_10:
    # Sketch16 → Boss-Extrude4 2 (new body)
    with BuildSketch(Plane.XZ.offset(10)):
        with Locations((0, -37.5)):
            Rectangle(SKETCH16_W, SKETCH16_H)
    extrude(amount=BOSS_EXTRUDE4_2_DEPTH)


with BuildPart() as cut_extrude1_tool:
    # Sketch17 → Cut-Extrude1 (new, through all)
    with BuildSketch(Plane.XZ.offset(13)):
        with Locations(Location((-100, 37.5, 0), (0, 0, 270))):
            Circle(SKETCH17_R)
        with Locations(Location((-100, -37.5, 0), (0, 0, 90))):
            Circle(SKETCH17_R)
        with Locations(Location((100, -37.5, 0), (0, 0, 270))):
            Circle(SKETCH17_R)
        with Locations(Location((100, 37.5, 0), (0, 0, 270))):
            Circle(SKETCH17_R)
    extrude(amount=-CUT_EXTRUDE1_DEPTH)


with BuildPart() as body_3_1:
    add(body_3.part)

    # Cut-Extrude1: cut by cut_extrude1_tool
    add(cut_extrude1_tool.part, mode=Mode.SUBTRACT)


with BuildPart() as body_4_1:
    add(body_4.part)

    # Cut-Extrude1: cut by cut_extrude1_tool
    add(cut_extrude1_tool.part, mode=Mode.SUBTRACT)


with BuildPart() as body_9_1:
    add(body_9.part)

    # Cut-Extrude1: cut by cut_extrude1_tool
    add(cut_extrude1_tool.part, mode=Mode.SUBTRACT)


with BuildPart() as body_10_1:
    add(body_10.part)

    # Cut-Extrude1: cut by cut_extrude1_tool
    add(cut_extrude1_tool.part, mode=Mode.SUBTRACT)


with BuildPart() as body_11:
    # Sketch18 → Boss-Extrude5 (new body)
    with BuildSketch(Plane(origin=(0, -10, 0), x_dir=(1, 0, 0), z_dir=(0, 1, 0))):
        Rectangle(SKETCH18_W, SKETCH18_H)
    extrude(amount=BOSS_EXTRUDE5_DEPTH)


with BuildPart() as cut_extrude2_tool:
    # Sketch19 → Cut-Extrude2 (new, through all)
    with BuildSketch(Plane(origin=(0, -8.5, 0), x_dir=(1, 0, 0), z_dir=(0, 1, 0))):
        with Locations(Location((37.5, -37.5, 0), (0, 0, 270))):
            Circle(SKETCH19_R)
        with Locations(Location((-37.5, -37.5, 0), (0, 0, 270))):
            Circle(SKETCH19_R)
        with Locations(Location((37.5, 37.5, 0), (0, 0, 270))):
            Circle(SKETCH19_R)
        with Locations(Location((-37.5, 37.5, 0), (0, 0, 270))):
            Circle(SKETCH19_R)
    extrude(amount=-CUT_EXTRUDE2_DEPTH)


with BuildPart() as body_9_2:
    add(body_9_1.part)

    # Cut-Extrude2: cut by cut_extrude2_tool
    add(cut_extrude2_tool.part, mode=Mode.SUBTRACT)


with BuildPart() as body_10_2:
    add(body_10_1.part)

    # Cut-Extrude2: cut by cut_extrude2_tool
    add(cut_extrude2_tool.part, mode=Mode.SUBTRACT)


with BuildPart() as body_11_1:
    add(body_11.part)

    # Cut-Extrude2: cut by cut_extrude2_tool
    add(cut_extrude2_tool.part, mode=Mode.SUBTRACT)


solid = Compound([part.part, body_2.part, body_5.part, body_6.part, body_7.part, body_8.part, body_3_1.part, body_4_1.part, body_9_2.part, body_10_2.part, body_11_1.part])
